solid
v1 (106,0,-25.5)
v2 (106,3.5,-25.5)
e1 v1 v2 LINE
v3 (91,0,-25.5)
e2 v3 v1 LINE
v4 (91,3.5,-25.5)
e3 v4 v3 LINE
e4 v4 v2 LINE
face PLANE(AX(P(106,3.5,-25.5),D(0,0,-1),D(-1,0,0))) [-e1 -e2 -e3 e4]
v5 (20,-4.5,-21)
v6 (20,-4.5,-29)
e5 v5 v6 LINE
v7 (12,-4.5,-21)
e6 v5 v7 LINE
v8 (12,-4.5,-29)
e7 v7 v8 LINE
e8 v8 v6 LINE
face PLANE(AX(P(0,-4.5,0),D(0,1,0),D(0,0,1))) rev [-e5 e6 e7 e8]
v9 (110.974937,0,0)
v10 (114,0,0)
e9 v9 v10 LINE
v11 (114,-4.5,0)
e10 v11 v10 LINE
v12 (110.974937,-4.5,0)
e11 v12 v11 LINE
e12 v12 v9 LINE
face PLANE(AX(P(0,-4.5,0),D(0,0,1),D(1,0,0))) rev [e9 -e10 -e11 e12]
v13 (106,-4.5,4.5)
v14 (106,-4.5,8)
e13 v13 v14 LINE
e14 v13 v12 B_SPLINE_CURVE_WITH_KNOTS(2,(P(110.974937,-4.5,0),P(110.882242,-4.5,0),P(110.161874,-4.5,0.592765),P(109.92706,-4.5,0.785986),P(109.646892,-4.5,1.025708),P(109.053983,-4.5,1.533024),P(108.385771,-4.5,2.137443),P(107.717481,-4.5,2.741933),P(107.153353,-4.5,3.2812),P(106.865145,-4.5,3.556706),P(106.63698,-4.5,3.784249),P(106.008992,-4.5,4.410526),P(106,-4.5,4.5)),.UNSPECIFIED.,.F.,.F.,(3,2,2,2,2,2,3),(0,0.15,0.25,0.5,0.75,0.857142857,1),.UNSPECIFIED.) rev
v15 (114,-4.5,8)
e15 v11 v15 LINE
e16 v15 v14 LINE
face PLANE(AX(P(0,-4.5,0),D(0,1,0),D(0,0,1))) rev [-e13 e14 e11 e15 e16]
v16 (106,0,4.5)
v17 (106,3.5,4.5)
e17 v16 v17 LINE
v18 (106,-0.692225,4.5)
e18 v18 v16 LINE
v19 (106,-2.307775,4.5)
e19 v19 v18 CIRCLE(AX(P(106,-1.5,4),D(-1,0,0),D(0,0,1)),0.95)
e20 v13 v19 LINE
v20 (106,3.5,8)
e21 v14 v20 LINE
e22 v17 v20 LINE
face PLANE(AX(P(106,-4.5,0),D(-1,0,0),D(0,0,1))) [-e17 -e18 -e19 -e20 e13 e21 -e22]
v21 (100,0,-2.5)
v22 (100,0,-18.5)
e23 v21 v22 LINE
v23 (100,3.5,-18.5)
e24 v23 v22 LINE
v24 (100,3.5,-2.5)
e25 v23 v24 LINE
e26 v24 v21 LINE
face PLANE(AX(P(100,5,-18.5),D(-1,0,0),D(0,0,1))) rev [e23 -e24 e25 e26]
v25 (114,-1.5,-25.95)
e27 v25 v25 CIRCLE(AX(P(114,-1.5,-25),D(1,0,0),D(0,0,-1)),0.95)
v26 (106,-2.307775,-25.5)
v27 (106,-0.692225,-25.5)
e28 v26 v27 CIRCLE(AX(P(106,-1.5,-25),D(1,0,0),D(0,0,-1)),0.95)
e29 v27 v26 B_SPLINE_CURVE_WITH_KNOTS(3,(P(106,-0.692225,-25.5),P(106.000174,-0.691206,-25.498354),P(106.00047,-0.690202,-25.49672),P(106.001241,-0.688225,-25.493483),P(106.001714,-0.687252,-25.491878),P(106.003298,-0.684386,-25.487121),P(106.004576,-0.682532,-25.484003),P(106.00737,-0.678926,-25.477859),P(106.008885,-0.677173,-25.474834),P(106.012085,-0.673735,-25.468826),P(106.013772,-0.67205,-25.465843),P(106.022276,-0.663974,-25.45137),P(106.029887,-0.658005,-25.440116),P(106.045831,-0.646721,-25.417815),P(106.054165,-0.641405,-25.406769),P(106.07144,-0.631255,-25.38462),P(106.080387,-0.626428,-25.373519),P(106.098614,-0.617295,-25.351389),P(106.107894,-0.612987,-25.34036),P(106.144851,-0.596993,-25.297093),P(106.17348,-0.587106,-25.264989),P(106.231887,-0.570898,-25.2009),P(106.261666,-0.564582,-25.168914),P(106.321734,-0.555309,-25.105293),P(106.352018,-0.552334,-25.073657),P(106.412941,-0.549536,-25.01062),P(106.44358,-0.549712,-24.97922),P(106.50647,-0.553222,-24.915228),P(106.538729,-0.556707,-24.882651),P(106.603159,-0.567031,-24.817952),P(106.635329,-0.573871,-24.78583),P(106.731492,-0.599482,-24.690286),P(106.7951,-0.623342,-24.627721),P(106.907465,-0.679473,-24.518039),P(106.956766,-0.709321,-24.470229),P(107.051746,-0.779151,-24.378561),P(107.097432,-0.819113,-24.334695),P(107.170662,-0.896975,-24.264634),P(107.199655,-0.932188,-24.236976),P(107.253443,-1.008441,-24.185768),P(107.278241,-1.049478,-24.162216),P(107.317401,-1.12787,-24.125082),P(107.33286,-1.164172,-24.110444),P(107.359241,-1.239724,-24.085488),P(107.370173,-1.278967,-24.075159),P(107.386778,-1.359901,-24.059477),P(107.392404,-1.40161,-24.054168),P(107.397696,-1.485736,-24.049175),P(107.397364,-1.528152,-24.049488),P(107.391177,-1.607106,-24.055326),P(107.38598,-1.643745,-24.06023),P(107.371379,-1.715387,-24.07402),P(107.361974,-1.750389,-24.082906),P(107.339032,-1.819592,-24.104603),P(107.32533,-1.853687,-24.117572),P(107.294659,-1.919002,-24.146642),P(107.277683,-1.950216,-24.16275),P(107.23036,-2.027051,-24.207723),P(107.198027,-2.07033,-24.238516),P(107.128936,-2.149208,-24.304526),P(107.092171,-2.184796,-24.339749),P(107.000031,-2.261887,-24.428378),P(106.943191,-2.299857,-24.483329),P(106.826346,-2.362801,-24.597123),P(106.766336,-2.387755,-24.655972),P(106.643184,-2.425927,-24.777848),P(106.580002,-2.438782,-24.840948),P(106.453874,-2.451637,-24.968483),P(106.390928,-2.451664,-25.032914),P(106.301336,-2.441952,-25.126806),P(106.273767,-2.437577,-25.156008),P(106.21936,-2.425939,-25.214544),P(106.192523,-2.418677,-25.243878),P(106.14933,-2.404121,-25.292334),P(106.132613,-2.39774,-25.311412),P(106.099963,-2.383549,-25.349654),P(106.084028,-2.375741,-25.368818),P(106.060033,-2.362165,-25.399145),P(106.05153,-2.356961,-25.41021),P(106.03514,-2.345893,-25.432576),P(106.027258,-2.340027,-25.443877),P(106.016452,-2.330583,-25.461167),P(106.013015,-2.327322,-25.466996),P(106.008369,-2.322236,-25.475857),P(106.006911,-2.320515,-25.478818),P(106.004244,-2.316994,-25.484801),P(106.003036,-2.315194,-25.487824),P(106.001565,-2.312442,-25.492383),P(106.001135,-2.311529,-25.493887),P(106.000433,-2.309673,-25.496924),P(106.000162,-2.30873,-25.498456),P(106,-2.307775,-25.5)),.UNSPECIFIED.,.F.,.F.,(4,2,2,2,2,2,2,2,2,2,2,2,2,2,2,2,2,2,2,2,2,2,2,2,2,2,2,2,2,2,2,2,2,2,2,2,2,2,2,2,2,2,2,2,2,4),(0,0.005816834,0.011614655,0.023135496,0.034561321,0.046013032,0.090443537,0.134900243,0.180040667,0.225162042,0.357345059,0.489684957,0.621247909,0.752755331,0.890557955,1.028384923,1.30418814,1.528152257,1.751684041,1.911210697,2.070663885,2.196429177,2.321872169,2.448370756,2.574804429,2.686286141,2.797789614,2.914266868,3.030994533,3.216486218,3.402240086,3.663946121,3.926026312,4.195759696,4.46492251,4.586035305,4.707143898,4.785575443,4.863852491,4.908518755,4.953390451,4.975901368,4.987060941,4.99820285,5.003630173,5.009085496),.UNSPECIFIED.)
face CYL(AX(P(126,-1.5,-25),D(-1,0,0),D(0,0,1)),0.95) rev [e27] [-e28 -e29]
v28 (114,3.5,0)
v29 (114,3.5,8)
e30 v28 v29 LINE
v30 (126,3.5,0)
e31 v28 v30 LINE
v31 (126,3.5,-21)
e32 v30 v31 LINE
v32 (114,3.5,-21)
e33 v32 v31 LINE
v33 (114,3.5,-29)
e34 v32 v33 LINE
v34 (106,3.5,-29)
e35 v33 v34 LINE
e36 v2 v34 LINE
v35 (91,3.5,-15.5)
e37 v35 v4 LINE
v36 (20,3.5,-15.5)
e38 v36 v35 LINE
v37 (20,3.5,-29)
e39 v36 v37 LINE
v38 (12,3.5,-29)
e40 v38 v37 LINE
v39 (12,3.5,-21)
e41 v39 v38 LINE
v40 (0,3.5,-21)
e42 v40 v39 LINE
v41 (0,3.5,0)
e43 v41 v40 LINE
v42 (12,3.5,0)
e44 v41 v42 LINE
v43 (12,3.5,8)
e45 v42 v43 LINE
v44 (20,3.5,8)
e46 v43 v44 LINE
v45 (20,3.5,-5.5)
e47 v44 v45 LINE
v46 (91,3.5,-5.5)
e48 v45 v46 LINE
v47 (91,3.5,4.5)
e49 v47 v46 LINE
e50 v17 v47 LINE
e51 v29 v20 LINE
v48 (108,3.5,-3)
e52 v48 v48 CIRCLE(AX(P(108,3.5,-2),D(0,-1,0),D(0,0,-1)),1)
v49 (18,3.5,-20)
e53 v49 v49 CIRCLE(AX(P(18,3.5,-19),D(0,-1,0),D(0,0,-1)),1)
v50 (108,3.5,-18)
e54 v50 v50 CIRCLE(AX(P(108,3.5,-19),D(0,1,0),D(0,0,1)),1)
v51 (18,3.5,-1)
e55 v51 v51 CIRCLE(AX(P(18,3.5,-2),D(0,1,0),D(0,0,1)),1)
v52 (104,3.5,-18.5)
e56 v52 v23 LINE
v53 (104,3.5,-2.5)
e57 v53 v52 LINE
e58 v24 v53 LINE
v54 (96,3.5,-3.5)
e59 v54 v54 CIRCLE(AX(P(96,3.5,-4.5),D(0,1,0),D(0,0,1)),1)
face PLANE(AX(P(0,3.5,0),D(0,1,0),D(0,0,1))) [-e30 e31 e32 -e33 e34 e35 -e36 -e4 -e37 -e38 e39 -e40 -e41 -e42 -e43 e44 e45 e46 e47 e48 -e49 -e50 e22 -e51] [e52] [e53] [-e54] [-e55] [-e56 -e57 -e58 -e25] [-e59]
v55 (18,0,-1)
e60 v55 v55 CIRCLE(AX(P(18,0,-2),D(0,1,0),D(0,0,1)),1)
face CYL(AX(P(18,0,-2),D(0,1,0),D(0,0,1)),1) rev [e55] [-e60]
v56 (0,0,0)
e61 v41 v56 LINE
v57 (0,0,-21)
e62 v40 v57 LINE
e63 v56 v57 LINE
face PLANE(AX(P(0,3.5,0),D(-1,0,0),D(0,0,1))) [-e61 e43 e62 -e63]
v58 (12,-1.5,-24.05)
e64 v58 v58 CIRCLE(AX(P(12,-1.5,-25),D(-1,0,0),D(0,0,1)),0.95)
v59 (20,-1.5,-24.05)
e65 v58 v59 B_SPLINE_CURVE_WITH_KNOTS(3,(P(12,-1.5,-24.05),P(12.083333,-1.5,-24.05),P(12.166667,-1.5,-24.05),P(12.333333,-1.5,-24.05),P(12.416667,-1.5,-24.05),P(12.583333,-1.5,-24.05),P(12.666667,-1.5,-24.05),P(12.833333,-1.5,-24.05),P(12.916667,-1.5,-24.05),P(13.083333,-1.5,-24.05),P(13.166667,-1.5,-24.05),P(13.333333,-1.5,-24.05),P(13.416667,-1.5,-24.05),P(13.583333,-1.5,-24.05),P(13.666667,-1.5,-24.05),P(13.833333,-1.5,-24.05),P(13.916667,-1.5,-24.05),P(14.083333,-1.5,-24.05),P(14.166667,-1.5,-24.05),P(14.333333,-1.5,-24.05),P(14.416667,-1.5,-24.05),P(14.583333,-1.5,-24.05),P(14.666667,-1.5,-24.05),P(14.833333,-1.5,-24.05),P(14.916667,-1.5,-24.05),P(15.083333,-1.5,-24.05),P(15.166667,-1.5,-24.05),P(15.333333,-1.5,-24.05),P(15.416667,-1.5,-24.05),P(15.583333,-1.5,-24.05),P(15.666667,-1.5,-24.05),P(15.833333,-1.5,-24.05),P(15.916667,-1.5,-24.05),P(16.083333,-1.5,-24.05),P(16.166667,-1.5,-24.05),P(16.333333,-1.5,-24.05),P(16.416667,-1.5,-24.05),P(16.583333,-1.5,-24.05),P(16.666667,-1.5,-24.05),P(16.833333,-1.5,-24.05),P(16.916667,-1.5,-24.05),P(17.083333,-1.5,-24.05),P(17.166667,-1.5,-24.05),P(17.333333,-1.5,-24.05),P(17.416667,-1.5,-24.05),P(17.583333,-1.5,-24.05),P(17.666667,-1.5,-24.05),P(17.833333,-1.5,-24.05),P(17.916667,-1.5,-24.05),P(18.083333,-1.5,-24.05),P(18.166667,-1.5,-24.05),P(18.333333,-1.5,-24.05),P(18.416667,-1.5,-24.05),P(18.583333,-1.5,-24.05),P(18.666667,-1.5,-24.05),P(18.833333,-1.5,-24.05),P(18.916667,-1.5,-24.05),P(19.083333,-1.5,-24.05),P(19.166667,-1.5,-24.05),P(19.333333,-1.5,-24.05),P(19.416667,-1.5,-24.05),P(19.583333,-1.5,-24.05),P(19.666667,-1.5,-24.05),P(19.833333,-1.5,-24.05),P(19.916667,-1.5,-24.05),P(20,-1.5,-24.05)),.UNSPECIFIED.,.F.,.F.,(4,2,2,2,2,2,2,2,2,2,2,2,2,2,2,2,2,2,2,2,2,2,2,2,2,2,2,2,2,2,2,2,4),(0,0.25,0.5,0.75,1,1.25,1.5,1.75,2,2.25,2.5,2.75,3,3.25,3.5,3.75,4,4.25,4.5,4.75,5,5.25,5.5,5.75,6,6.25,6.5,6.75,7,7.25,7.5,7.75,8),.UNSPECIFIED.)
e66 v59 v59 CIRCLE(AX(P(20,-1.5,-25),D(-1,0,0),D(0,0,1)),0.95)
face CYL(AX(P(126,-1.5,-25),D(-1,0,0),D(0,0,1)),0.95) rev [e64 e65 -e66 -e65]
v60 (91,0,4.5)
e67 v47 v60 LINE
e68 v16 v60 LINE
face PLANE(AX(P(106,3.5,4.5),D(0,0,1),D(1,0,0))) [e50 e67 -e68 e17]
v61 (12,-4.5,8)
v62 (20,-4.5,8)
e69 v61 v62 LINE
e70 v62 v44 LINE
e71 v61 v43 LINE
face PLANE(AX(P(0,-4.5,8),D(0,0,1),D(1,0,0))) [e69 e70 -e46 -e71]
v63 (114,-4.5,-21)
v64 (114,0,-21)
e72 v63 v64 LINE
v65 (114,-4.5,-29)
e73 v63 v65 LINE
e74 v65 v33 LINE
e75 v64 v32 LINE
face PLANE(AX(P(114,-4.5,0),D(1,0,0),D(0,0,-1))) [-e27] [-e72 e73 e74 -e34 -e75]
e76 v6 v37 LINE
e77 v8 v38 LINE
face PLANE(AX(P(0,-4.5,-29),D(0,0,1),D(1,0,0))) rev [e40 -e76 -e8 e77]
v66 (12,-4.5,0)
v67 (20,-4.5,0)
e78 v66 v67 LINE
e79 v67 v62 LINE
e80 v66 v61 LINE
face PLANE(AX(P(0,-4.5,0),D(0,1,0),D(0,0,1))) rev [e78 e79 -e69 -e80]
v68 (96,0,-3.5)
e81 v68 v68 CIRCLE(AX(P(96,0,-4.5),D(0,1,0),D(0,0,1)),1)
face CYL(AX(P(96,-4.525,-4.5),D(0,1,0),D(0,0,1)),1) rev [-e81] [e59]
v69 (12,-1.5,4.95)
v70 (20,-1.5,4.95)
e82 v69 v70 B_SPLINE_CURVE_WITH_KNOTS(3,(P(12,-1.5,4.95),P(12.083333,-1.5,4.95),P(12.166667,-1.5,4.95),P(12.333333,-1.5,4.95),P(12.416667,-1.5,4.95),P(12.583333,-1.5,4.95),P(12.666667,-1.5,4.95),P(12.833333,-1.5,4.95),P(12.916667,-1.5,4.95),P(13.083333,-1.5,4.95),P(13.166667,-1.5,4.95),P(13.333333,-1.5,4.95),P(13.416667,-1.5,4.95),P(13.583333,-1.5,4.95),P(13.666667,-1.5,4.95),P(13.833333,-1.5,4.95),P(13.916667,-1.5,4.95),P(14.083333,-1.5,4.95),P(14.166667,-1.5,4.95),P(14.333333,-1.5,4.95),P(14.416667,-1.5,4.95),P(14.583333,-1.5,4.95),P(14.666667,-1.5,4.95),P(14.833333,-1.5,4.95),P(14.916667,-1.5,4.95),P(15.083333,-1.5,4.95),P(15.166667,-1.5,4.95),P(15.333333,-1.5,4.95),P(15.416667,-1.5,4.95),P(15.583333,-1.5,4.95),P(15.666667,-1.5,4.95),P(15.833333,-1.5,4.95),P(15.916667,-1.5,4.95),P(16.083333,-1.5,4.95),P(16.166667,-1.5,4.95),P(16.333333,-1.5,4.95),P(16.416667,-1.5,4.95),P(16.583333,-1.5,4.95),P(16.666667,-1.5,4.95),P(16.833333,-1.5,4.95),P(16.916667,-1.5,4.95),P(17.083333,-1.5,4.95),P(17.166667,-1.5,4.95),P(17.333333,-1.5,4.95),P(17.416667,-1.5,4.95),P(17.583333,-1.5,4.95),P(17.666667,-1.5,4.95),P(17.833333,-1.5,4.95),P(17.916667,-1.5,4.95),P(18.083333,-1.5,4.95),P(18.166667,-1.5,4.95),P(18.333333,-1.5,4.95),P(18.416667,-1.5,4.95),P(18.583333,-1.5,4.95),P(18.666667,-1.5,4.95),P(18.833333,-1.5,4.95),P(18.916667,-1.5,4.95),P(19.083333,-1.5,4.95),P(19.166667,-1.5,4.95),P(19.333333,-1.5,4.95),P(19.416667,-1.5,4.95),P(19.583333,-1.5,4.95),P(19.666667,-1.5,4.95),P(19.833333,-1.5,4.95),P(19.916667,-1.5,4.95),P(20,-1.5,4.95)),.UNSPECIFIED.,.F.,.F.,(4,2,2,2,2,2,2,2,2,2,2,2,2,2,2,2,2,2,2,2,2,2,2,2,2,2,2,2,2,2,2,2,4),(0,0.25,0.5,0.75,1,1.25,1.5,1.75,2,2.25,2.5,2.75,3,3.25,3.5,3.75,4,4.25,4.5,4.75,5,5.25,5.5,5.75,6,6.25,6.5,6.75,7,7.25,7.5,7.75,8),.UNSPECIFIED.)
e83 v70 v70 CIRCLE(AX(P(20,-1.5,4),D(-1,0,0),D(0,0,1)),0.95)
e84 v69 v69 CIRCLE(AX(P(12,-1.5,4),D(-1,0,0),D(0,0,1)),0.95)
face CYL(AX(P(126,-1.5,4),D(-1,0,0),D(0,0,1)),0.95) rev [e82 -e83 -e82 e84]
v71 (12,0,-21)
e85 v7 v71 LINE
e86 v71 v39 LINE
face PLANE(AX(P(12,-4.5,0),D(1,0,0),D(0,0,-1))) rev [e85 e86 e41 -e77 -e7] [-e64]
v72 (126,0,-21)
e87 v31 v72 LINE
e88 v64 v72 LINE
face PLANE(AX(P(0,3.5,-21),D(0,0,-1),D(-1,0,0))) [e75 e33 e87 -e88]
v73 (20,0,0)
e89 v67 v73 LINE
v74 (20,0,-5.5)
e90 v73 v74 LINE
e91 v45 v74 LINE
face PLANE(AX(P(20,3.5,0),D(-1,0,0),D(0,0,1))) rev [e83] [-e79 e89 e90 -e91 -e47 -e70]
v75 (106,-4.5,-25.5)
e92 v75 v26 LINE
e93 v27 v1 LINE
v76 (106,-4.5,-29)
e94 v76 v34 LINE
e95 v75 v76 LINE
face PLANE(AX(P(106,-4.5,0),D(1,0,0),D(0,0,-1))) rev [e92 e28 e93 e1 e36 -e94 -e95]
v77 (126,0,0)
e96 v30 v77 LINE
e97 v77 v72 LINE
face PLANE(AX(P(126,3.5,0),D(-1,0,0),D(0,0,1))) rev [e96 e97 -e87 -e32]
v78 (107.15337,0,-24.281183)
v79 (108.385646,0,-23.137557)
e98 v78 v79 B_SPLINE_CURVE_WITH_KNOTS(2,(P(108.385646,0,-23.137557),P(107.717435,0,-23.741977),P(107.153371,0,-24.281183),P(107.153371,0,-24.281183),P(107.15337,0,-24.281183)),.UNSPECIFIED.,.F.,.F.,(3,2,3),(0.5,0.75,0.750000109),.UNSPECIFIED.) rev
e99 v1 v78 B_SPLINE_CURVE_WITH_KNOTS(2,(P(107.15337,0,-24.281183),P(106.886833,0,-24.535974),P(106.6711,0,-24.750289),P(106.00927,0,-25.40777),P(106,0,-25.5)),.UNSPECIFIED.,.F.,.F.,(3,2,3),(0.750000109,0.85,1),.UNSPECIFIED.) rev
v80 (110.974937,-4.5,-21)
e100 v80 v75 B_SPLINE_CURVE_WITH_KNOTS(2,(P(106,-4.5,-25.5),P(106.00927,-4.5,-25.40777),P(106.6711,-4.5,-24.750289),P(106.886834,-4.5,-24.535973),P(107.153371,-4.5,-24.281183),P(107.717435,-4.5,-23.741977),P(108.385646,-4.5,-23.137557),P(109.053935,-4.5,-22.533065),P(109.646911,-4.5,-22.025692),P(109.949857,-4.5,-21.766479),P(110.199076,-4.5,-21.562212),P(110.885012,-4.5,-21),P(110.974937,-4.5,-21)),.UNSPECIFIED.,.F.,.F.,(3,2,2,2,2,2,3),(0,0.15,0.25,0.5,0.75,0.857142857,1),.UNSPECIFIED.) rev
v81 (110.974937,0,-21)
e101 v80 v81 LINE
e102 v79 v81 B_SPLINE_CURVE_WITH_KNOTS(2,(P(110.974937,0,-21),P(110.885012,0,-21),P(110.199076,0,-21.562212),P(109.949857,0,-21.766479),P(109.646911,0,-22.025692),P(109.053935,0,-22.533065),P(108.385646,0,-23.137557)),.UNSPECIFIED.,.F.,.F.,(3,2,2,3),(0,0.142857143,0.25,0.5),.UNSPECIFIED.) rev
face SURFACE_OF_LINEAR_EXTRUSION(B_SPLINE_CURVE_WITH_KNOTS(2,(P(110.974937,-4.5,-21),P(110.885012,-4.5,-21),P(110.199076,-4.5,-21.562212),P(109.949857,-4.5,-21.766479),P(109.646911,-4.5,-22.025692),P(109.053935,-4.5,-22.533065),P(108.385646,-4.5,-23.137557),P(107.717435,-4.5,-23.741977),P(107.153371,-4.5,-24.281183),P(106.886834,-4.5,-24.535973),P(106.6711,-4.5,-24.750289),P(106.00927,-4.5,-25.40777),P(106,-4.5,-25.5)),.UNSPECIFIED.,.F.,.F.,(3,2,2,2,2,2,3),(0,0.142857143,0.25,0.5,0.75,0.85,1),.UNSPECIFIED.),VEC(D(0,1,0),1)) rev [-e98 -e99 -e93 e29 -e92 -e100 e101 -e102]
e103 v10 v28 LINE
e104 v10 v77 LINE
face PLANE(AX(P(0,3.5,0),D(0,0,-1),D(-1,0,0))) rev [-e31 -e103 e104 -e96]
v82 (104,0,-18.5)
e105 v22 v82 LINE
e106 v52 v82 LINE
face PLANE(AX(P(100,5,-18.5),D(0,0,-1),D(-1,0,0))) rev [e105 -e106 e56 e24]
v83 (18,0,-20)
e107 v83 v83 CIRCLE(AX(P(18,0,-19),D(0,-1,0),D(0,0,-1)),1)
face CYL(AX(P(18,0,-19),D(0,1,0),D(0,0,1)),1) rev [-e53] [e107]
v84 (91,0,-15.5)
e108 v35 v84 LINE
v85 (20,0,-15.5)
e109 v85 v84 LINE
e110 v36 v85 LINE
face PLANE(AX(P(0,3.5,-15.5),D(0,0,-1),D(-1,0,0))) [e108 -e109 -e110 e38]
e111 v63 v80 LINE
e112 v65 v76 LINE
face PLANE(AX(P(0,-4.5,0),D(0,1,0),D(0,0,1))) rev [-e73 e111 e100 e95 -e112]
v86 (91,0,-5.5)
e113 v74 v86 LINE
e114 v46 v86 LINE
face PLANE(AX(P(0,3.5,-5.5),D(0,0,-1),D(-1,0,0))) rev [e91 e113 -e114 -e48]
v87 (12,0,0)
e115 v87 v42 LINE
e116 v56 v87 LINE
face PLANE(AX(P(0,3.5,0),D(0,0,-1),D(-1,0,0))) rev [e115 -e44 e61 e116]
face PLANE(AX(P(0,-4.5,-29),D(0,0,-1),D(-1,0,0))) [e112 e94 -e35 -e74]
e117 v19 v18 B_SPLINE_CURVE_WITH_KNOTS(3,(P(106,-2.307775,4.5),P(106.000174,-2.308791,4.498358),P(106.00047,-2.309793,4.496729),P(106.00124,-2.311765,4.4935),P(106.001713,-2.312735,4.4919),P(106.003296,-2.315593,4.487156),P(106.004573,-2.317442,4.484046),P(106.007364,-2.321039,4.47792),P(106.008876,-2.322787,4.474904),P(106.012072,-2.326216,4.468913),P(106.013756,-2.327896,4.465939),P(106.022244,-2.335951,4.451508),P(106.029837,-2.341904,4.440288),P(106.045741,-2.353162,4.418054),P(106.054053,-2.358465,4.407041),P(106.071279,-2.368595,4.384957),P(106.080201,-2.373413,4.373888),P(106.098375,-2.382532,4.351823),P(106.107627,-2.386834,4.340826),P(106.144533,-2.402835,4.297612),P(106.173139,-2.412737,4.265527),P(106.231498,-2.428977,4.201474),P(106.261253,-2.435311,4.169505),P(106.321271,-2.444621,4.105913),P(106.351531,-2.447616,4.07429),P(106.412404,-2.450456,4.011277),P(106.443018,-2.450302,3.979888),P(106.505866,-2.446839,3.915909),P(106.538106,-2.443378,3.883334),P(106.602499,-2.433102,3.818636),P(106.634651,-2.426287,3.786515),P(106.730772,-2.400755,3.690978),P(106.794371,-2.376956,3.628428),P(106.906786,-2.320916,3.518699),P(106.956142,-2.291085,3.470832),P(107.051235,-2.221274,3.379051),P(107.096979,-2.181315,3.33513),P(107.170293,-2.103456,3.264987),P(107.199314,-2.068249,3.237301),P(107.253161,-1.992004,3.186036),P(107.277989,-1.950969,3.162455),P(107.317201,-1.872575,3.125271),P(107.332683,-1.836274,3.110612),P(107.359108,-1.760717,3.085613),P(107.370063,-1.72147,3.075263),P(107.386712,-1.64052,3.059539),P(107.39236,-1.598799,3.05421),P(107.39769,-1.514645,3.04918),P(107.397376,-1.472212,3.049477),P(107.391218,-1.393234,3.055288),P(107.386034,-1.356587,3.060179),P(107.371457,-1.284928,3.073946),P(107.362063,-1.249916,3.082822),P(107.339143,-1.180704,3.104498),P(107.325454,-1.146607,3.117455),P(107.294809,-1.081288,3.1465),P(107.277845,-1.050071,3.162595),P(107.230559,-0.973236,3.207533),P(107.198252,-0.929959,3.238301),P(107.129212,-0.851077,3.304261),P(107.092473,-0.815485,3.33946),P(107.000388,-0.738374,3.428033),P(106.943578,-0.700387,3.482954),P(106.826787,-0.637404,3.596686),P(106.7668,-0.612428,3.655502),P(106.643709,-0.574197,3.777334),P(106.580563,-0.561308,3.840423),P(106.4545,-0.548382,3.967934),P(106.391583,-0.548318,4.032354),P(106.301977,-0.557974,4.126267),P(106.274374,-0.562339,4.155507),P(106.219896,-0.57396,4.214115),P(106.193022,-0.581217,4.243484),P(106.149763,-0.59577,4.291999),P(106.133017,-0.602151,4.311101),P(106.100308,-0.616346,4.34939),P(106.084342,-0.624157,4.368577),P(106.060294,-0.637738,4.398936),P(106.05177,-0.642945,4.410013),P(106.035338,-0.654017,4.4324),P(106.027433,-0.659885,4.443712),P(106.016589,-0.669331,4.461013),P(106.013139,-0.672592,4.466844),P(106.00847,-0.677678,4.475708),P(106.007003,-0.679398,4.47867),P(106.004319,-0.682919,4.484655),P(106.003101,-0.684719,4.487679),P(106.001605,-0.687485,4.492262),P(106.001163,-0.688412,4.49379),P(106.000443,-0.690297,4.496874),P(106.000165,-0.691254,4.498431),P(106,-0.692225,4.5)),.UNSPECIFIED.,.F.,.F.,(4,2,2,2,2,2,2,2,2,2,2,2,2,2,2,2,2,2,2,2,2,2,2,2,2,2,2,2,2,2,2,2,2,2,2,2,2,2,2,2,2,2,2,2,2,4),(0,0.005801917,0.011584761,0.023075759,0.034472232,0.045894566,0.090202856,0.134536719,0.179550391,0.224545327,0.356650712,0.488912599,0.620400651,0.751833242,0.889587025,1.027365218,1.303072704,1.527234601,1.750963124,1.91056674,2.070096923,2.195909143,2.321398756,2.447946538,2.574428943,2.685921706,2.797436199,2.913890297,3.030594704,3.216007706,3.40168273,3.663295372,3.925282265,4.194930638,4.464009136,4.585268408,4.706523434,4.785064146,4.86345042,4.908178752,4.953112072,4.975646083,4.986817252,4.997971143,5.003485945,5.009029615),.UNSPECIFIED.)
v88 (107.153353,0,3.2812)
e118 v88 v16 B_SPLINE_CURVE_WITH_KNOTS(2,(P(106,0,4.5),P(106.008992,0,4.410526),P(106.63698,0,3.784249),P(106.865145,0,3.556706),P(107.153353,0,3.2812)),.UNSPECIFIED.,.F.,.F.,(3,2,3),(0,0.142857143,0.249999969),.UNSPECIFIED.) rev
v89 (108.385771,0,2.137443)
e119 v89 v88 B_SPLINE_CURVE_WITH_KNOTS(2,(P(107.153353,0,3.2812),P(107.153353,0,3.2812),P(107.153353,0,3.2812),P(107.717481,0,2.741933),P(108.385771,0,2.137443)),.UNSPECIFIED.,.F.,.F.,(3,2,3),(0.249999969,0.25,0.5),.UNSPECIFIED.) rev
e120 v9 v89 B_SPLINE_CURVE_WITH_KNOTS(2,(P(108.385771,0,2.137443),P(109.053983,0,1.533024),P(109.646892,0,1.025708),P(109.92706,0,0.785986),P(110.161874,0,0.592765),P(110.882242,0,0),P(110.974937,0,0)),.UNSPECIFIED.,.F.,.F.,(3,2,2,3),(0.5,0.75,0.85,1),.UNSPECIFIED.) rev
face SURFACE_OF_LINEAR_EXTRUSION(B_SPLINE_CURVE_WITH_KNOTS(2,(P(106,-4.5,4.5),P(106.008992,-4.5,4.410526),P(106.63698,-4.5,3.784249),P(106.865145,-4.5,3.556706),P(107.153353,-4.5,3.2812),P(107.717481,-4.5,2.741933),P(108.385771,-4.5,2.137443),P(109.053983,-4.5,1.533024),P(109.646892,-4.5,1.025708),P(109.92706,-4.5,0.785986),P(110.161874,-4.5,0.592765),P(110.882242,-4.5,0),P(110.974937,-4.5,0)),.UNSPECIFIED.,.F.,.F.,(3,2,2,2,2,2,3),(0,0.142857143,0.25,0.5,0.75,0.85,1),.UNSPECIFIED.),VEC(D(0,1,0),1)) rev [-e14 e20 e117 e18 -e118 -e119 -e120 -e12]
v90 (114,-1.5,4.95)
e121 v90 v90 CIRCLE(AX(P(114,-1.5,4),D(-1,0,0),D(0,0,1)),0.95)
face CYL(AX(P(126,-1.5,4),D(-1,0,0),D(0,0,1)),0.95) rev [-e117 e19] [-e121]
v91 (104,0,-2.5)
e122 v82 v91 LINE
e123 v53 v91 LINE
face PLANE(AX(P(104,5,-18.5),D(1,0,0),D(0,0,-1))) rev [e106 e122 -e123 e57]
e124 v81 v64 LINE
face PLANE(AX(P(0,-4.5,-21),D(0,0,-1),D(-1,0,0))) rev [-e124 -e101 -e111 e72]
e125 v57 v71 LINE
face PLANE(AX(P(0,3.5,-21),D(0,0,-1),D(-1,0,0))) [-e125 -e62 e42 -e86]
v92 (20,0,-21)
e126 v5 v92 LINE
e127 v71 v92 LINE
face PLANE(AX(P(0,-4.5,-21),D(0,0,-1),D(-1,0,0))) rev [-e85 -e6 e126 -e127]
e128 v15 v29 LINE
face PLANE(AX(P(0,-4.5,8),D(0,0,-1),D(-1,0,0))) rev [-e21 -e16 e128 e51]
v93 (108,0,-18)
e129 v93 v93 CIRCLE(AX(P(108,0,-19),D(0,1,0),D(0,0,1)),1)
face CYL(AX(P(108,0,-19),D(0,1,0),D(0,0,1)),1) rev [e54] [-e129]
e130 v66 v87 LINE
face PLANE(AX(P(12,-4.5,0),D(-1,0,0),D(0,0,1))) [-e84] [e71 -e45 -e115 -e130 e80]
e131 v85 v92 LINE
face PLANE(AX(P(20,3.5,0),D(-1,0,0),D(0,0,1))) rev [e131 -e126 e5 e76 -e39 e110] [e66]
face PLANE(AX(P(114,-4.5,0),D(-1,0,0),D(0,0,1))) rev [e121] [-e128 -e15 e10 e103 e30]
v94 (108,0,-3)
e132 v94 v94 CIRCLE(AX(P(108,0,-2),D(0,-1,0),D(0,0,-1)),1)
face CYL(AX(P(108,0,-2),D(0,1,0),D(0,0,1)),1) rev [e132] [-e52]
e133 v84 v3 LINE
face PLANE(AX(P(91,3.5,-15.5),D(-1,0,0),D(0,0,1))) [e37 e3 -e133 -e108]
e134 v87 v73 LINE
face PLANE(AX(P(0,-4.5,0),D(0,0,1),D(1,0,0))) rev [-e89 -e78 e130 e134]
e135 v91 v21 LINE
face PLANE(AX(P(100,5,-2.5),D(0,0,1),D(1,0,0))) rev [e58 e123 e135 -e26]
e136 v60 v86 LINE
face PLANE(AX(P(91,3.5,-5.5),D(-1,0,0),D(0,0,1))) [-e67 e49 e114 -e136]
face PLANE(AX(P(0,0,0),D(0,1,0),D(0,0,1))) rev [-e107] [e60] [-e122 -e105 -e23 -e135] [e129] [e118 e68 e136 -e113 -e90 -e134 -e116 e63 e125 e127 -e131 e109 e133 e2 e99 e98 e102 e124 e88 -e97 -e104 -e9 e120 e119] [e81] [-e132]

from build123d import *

# Parameters (mm, degrees)
EXTRUDE_1_DEPTH       = 3.5
SKETCH_2_R            = 1
CUT_EXTRUDE_1_DEPTH   = 128.785953845
SKETCH_3_W            = 15
SKETCH_3_H            = 10
EXTRUDE_2_DEPTH       = 3.5
SKETCH_4_W            = 4
SKETCH_4_H            = 16
CUT_EXTRUDE_2_DEPTH   = 5
FILLET_1_DEPTH        = 3.5
EXTRUDE_START         = 12
EXTRUDE_3_OUTLINE_W   = 8
EXTRUDE_3_OUTLINE_H   = 8
EXTRUDE_3_DEPTH       = 8
EXTRUDE_START_2       = 110.974937086
EXTRUDE_3_2_OUTLINE_W = 8
EXTRUDE_3_2_OUTLINE_H = 8
EXTRUDE_3_2_DEPTH     = 3.025062914
EXTRUDE_START_3       = -29
EXTRUDE_3_3_OUTLINE_W = 4.974937086
EXTRUDE_3_3_OUTLINE_H = 3.5
EXTRUDE_3_3_DEPTH     = 8.0000001
EXTRUDE_START_4       = -1e-07
EXTRUDE_3_4_OUTLINE_W = 4.974937086
EXTRUDE_3_4_OUTLINE_H = 3.5
EXTRUDE_3_4_DEPTH     = 8.0000001
EXTRUDE_START_5       = 4.5
EXTRUDE_3_5_OUTLINE_W = 4.974937086
EXTRUDE_3_5_OUTLINE_H = 4.5
EXTRUDE_3_5_DEPTH     = 3.5
EXTRUDE_3_6_OUTLINE_W = 4.974937086
EXTRUDE_3_6_OUTLINE_H = 4.5
EXTRUDE_3_6_DEPTH     = 3.4999999
EXTRUDE_START_6       = -4.5
EXTRUDE_3_7_DEPTH     = 5.5
SKETCH_6_R            = 0.95
CUT_EXTRUDE_3_DEPTH   = 118.716821353
SKETCH_7_R            = 1
CUT_EXTRUDE_4_DEPTH   = 130.541499268


with BuildPart() as part:
    # 草图1 → 凸台-拉伸1 (new body)
    with BuildSketch(Plane(origin=(0, 0, 0), x_dir=(1, 0, 0), z_dir=(0, 1, 0))):
        Polygon((106, 15.5), (106, 21), (126, 21), (126, 0), (106, 0), (106, 5.5), (20, 5.5), (20, 0), (0, 0), (0, 21), (20, 21), (20, 15.5), align=None)
    extrude(amount=EXTRUDE_1_DEPTH)

    # 草图2 → 切除-拉伸1 (cut, through all)
    with BuildSketch(Plane(origin=(0, 3.5, 0), x_dir=(1, 0, 0), z_dir=(0, 1, 0))):
        with Locations(Location((108, 19, 0), (0, 0, 270))):
            Circle(SKETCH_2_R)
        with Locations(Location((108, 2, 0), (0, 0, 90))):
            Circle(SKETCH_2_R)
        with Locations(Location((18, 19, 0), (0, 0, 90))):
            Circle(SKETCH_2_R)
        with Locations(Location((18, 2, 0), (0, 0, 270))):
            Circle(SKETCH_2_R)
    extrude(amount=-CUT_EXTRUDE_1_DEPTH, mode=Mode.SUBTRACT)

    # 草图3 → 凸台-拉伸2 (add)
    with BuildSketch(Plane(origin=(0, 0, 0), x_dir=(-1, 0, 0), z_dir=(0, -1, 0))):
        with Locations((-98.5, 20.5)):
            Rectangle(SKETCH_3_W, SKETCH_3_H)
        with Locations((-98.5, 0.5)):
            Rectangle(SKETCH_3_W, SKETCH_3_H)
    extrude(amount=-EXTRUDE_2_DEPTH)

    # 草图4 → 切除-拉伸2 (cut)
    with BuildSketch(Plane(origin=(0, 0, 0), x_dir=(-1, 0, 0), z_dir=(0, -1, 0))):
        with Locations((-102, 10.5)):
            Rectangle(SKETCH_4_W, SKETCH_4_H)
    extrude(amount=-CUT_EXTRUDE_2_DEPTH, mode=Mode.SUBTRACT)

    # 圆角1: read off the stored shape, not the designer's step
    # 圆角1 outline → 圆角1 (add)
    with BuildSketch(Plane(origin=(0, 0, 0), x_dir=(1, 0, 0), z_dir=(0, 1, 0))):
        with BuildLine():
            Line((106, 21), (110.974937186, 21))
            add(Edge.make_bspline(
                [(110.974937186, 21), (106.452267017, 21), (106, 25.5)],
                knots=[0, 0, 0, 1, 1, 1], degree=2, weights=[1, 0.052631579, 1]))
            Line((106, 25.5), (106, 21))
        make_face()
        with BuildLine():
            add(Edge.make_bspline(
                [(110.974937186, 0), (106.452267017, 0), (106, -4.5)],
                knots=[0, 0, 0, 1, 1, 1], degree=2, weights=[1, 0.052631579, 1]))
            Line((110.974937186, 0), (106, 0))
            Line((106, 0), (106, -4.5))
        make_face()
    extrude(amount=FILLET_1_DEPTH)

    # 凸台-拉伸3: read off the stored shape, not the designer's step
    # 凸台-拉伸3 outline → 凸台-拉伸3 (add)
    with BuildSketch(Plane.YZ.offset(EXTRUDE_START)):
        with Locations((-0.5, -25)):
            Rectangle(EXTRUDE_3_OUTLINE_W, EXTRUDE_3_OUTLINE_H)
        with Locations((-0.5, 4)):
            Rectangle(EXTRUDE_3_OUTLINE_W, EXTRUDE_3_OUTLINE_H)
    extrude(amount=EXTRUDE_3_DEPTH)

    # Extrude 3 2 outline → Extrude 3 2 (add)
    with BuildSketch(Plane.YZ.offset(EXTRUDE_START_2)):
        with Locations((-0.5, -25)):
            Rectangle(EXTRUDE_3_2_OUTLINE_W, EXTRUDE_3_2_OUTLINE_H)
        with Locations((-0.5, 4)):
            Rectangle(EXTRUDE_3_2_OUTLINE_W, EXTRUDE_3_2_OUTLINE_H)
    extrude(amount=EXTRUDE_3_2_DEPTH)

    # Extrude 3 3 outline → Extrude 3 3 (add)
    with BuildSketch(Plane.XY.offset(EXTRUDE_START_3)):
        with Locations((108.487468543, 1.75)):
            Rectangle(EXTRUDE_3_3_OUTLINE_W, EXTRUDE_3_3_OUTLINE_H)
    extrude(amount=EXTRUDE_3_3_DEPTH)

    # Extrude 3 4 outline → Extrude 3 4 (add)
    with BuildSketch(Plane.XY.offset(EXTRUDE_START_4)):
        with Locations((108.487468543, 1.75)):
            Rectangle(EXTRUDE_3_4_OUTLINE_W, EXTRUDE_3_4_OUTLINE_H)
    extrude(amount=EXTRUDE_3_4_DEPTH)

    # Extrude 3 5 outline → Extrude 3 5 (add)
    with BuildSketch(Plane.XY.offset(EXTRUDE_START_5)):
        with Locations((108.487468543, -2.25)):
            Rectangle(EXTRUDE_3_5_OUTLINE_W, EXTRUDE_3_5_OUTLINE_H)
    extrude(amount=EXTRUDE_3_5_DEPTH)

    # Extrude 3 6 outline → Extrude 3 6 (add)
    with BuildSketch(Plane.XY.offset(EXTRUDE_START_3)):
        with Locations((108.487468543, -2.25)):
            Rectangle(EXTRUDE_3_6_OUTLINE_W, EXTRUDE_3_6_OUTLINE_H)
    extrude(amount=EXTRUDE_3_6_DEPTH)

    # Extrude 3 7 outline → Extrude 3 7 (add)
    with BuildSketch(Plane(origin=(0, 0, 0), x_dir=(1, 0, 0), z_dir=(0, 1, 0)).offset(EXTRUDE_START_6)):
        with BuildLine():
            Line((110.974937186, 21), (114, 21))
            Line((114, 21), (114, 29))
            Line((114, 29), (106, 29))
            Line((106, 29), (106, 25.5))
            add(Edge.make_bspline(
                [(106, 25.5), (106.009269507, 25.407769569), (106.671100156, 24.750288943), (106.886833575, 24.535973478), (107.15337097, 24.28118269), (107.717435122, 23.741977487), (108.385645722, 23.137556797), (109.053934894, 22.533065037), (109.646910819, 22.025691943), (109.949857187, 21.766479336), (110.199076342, 21.562212351), (110.885012382, 21), (110.974937186, 21)],
                knots=[0, 0, 0, 0.15, 0.15, 0.25, 0.25, 0.5, 0.5, 0.75, 0.75, 0.857142857, 0.857142857, 1, 1, 1], degree=2))
        make_face()
        with BuildLine():
            Line((114, -8), (114, 0))
            Line((114, 0), (110.974937186, 0))
            add(Edge.make_bspline(
                [(110.974937186, 0), (110.882242115, 0), (110.161874087, -0.592765119), (109.92705955, -0.785985614), (109.646892177, -1.025707894), (109.053983358, -1.533024119), (108.385771306, -2.137443203), (107.717480681, -2.741933357), (107.153353234, -3.281199644), (106.86514531, -3.556706213), (106.636980311, -3.784249442), (106.00899248, -4.41052595), (106, -4.5)],
                knots=[0, 0, 0, 0.15, 0.15, 0.25, 0.25, 0.5, 0.5, 0.75, 0.75, 0.857142857, 0.857142857, 1, 1, 1], degree=2))
            Line((106, -4.5), (106, -8))
            Line((106, -8), (114, -8))
        make_face()
    extrude(amount=EXTRUDE_3_7_DEPTH)

    # 草图6 → 切除-拉伸3 (cut, through all)
    with BuildSketch(Plane.ZY.offset(-12)):
        with Locations(Location((-25, -1.5, 0), (0, 0, 238.243136141))):
            Circle(SKETCH_6_R)
        with Locations((4, -1.5)):
            Circle(SKETCH_6_R)
    extrude(amount=-CUT_EXTRUDE_3_DEPTH, mode=Mode.SUBTRACT)

    # 草图7 → 切除-拉伸4 (cut, through all)
    with BuildSketch(Plane(origin=(0, 3.5, 0), x_dir=(1, 0, 0), z_dir=(0, 1, 0))):
        with Locations(Location((96, 4.5, 0), (0, 0, 270))):
            Circle(SKETCH_7_R)
    extrude(amount=-CUT_EXTRUDE_4_DEPTH, mode=Mode.SUBTRACT)


solid = part.part
